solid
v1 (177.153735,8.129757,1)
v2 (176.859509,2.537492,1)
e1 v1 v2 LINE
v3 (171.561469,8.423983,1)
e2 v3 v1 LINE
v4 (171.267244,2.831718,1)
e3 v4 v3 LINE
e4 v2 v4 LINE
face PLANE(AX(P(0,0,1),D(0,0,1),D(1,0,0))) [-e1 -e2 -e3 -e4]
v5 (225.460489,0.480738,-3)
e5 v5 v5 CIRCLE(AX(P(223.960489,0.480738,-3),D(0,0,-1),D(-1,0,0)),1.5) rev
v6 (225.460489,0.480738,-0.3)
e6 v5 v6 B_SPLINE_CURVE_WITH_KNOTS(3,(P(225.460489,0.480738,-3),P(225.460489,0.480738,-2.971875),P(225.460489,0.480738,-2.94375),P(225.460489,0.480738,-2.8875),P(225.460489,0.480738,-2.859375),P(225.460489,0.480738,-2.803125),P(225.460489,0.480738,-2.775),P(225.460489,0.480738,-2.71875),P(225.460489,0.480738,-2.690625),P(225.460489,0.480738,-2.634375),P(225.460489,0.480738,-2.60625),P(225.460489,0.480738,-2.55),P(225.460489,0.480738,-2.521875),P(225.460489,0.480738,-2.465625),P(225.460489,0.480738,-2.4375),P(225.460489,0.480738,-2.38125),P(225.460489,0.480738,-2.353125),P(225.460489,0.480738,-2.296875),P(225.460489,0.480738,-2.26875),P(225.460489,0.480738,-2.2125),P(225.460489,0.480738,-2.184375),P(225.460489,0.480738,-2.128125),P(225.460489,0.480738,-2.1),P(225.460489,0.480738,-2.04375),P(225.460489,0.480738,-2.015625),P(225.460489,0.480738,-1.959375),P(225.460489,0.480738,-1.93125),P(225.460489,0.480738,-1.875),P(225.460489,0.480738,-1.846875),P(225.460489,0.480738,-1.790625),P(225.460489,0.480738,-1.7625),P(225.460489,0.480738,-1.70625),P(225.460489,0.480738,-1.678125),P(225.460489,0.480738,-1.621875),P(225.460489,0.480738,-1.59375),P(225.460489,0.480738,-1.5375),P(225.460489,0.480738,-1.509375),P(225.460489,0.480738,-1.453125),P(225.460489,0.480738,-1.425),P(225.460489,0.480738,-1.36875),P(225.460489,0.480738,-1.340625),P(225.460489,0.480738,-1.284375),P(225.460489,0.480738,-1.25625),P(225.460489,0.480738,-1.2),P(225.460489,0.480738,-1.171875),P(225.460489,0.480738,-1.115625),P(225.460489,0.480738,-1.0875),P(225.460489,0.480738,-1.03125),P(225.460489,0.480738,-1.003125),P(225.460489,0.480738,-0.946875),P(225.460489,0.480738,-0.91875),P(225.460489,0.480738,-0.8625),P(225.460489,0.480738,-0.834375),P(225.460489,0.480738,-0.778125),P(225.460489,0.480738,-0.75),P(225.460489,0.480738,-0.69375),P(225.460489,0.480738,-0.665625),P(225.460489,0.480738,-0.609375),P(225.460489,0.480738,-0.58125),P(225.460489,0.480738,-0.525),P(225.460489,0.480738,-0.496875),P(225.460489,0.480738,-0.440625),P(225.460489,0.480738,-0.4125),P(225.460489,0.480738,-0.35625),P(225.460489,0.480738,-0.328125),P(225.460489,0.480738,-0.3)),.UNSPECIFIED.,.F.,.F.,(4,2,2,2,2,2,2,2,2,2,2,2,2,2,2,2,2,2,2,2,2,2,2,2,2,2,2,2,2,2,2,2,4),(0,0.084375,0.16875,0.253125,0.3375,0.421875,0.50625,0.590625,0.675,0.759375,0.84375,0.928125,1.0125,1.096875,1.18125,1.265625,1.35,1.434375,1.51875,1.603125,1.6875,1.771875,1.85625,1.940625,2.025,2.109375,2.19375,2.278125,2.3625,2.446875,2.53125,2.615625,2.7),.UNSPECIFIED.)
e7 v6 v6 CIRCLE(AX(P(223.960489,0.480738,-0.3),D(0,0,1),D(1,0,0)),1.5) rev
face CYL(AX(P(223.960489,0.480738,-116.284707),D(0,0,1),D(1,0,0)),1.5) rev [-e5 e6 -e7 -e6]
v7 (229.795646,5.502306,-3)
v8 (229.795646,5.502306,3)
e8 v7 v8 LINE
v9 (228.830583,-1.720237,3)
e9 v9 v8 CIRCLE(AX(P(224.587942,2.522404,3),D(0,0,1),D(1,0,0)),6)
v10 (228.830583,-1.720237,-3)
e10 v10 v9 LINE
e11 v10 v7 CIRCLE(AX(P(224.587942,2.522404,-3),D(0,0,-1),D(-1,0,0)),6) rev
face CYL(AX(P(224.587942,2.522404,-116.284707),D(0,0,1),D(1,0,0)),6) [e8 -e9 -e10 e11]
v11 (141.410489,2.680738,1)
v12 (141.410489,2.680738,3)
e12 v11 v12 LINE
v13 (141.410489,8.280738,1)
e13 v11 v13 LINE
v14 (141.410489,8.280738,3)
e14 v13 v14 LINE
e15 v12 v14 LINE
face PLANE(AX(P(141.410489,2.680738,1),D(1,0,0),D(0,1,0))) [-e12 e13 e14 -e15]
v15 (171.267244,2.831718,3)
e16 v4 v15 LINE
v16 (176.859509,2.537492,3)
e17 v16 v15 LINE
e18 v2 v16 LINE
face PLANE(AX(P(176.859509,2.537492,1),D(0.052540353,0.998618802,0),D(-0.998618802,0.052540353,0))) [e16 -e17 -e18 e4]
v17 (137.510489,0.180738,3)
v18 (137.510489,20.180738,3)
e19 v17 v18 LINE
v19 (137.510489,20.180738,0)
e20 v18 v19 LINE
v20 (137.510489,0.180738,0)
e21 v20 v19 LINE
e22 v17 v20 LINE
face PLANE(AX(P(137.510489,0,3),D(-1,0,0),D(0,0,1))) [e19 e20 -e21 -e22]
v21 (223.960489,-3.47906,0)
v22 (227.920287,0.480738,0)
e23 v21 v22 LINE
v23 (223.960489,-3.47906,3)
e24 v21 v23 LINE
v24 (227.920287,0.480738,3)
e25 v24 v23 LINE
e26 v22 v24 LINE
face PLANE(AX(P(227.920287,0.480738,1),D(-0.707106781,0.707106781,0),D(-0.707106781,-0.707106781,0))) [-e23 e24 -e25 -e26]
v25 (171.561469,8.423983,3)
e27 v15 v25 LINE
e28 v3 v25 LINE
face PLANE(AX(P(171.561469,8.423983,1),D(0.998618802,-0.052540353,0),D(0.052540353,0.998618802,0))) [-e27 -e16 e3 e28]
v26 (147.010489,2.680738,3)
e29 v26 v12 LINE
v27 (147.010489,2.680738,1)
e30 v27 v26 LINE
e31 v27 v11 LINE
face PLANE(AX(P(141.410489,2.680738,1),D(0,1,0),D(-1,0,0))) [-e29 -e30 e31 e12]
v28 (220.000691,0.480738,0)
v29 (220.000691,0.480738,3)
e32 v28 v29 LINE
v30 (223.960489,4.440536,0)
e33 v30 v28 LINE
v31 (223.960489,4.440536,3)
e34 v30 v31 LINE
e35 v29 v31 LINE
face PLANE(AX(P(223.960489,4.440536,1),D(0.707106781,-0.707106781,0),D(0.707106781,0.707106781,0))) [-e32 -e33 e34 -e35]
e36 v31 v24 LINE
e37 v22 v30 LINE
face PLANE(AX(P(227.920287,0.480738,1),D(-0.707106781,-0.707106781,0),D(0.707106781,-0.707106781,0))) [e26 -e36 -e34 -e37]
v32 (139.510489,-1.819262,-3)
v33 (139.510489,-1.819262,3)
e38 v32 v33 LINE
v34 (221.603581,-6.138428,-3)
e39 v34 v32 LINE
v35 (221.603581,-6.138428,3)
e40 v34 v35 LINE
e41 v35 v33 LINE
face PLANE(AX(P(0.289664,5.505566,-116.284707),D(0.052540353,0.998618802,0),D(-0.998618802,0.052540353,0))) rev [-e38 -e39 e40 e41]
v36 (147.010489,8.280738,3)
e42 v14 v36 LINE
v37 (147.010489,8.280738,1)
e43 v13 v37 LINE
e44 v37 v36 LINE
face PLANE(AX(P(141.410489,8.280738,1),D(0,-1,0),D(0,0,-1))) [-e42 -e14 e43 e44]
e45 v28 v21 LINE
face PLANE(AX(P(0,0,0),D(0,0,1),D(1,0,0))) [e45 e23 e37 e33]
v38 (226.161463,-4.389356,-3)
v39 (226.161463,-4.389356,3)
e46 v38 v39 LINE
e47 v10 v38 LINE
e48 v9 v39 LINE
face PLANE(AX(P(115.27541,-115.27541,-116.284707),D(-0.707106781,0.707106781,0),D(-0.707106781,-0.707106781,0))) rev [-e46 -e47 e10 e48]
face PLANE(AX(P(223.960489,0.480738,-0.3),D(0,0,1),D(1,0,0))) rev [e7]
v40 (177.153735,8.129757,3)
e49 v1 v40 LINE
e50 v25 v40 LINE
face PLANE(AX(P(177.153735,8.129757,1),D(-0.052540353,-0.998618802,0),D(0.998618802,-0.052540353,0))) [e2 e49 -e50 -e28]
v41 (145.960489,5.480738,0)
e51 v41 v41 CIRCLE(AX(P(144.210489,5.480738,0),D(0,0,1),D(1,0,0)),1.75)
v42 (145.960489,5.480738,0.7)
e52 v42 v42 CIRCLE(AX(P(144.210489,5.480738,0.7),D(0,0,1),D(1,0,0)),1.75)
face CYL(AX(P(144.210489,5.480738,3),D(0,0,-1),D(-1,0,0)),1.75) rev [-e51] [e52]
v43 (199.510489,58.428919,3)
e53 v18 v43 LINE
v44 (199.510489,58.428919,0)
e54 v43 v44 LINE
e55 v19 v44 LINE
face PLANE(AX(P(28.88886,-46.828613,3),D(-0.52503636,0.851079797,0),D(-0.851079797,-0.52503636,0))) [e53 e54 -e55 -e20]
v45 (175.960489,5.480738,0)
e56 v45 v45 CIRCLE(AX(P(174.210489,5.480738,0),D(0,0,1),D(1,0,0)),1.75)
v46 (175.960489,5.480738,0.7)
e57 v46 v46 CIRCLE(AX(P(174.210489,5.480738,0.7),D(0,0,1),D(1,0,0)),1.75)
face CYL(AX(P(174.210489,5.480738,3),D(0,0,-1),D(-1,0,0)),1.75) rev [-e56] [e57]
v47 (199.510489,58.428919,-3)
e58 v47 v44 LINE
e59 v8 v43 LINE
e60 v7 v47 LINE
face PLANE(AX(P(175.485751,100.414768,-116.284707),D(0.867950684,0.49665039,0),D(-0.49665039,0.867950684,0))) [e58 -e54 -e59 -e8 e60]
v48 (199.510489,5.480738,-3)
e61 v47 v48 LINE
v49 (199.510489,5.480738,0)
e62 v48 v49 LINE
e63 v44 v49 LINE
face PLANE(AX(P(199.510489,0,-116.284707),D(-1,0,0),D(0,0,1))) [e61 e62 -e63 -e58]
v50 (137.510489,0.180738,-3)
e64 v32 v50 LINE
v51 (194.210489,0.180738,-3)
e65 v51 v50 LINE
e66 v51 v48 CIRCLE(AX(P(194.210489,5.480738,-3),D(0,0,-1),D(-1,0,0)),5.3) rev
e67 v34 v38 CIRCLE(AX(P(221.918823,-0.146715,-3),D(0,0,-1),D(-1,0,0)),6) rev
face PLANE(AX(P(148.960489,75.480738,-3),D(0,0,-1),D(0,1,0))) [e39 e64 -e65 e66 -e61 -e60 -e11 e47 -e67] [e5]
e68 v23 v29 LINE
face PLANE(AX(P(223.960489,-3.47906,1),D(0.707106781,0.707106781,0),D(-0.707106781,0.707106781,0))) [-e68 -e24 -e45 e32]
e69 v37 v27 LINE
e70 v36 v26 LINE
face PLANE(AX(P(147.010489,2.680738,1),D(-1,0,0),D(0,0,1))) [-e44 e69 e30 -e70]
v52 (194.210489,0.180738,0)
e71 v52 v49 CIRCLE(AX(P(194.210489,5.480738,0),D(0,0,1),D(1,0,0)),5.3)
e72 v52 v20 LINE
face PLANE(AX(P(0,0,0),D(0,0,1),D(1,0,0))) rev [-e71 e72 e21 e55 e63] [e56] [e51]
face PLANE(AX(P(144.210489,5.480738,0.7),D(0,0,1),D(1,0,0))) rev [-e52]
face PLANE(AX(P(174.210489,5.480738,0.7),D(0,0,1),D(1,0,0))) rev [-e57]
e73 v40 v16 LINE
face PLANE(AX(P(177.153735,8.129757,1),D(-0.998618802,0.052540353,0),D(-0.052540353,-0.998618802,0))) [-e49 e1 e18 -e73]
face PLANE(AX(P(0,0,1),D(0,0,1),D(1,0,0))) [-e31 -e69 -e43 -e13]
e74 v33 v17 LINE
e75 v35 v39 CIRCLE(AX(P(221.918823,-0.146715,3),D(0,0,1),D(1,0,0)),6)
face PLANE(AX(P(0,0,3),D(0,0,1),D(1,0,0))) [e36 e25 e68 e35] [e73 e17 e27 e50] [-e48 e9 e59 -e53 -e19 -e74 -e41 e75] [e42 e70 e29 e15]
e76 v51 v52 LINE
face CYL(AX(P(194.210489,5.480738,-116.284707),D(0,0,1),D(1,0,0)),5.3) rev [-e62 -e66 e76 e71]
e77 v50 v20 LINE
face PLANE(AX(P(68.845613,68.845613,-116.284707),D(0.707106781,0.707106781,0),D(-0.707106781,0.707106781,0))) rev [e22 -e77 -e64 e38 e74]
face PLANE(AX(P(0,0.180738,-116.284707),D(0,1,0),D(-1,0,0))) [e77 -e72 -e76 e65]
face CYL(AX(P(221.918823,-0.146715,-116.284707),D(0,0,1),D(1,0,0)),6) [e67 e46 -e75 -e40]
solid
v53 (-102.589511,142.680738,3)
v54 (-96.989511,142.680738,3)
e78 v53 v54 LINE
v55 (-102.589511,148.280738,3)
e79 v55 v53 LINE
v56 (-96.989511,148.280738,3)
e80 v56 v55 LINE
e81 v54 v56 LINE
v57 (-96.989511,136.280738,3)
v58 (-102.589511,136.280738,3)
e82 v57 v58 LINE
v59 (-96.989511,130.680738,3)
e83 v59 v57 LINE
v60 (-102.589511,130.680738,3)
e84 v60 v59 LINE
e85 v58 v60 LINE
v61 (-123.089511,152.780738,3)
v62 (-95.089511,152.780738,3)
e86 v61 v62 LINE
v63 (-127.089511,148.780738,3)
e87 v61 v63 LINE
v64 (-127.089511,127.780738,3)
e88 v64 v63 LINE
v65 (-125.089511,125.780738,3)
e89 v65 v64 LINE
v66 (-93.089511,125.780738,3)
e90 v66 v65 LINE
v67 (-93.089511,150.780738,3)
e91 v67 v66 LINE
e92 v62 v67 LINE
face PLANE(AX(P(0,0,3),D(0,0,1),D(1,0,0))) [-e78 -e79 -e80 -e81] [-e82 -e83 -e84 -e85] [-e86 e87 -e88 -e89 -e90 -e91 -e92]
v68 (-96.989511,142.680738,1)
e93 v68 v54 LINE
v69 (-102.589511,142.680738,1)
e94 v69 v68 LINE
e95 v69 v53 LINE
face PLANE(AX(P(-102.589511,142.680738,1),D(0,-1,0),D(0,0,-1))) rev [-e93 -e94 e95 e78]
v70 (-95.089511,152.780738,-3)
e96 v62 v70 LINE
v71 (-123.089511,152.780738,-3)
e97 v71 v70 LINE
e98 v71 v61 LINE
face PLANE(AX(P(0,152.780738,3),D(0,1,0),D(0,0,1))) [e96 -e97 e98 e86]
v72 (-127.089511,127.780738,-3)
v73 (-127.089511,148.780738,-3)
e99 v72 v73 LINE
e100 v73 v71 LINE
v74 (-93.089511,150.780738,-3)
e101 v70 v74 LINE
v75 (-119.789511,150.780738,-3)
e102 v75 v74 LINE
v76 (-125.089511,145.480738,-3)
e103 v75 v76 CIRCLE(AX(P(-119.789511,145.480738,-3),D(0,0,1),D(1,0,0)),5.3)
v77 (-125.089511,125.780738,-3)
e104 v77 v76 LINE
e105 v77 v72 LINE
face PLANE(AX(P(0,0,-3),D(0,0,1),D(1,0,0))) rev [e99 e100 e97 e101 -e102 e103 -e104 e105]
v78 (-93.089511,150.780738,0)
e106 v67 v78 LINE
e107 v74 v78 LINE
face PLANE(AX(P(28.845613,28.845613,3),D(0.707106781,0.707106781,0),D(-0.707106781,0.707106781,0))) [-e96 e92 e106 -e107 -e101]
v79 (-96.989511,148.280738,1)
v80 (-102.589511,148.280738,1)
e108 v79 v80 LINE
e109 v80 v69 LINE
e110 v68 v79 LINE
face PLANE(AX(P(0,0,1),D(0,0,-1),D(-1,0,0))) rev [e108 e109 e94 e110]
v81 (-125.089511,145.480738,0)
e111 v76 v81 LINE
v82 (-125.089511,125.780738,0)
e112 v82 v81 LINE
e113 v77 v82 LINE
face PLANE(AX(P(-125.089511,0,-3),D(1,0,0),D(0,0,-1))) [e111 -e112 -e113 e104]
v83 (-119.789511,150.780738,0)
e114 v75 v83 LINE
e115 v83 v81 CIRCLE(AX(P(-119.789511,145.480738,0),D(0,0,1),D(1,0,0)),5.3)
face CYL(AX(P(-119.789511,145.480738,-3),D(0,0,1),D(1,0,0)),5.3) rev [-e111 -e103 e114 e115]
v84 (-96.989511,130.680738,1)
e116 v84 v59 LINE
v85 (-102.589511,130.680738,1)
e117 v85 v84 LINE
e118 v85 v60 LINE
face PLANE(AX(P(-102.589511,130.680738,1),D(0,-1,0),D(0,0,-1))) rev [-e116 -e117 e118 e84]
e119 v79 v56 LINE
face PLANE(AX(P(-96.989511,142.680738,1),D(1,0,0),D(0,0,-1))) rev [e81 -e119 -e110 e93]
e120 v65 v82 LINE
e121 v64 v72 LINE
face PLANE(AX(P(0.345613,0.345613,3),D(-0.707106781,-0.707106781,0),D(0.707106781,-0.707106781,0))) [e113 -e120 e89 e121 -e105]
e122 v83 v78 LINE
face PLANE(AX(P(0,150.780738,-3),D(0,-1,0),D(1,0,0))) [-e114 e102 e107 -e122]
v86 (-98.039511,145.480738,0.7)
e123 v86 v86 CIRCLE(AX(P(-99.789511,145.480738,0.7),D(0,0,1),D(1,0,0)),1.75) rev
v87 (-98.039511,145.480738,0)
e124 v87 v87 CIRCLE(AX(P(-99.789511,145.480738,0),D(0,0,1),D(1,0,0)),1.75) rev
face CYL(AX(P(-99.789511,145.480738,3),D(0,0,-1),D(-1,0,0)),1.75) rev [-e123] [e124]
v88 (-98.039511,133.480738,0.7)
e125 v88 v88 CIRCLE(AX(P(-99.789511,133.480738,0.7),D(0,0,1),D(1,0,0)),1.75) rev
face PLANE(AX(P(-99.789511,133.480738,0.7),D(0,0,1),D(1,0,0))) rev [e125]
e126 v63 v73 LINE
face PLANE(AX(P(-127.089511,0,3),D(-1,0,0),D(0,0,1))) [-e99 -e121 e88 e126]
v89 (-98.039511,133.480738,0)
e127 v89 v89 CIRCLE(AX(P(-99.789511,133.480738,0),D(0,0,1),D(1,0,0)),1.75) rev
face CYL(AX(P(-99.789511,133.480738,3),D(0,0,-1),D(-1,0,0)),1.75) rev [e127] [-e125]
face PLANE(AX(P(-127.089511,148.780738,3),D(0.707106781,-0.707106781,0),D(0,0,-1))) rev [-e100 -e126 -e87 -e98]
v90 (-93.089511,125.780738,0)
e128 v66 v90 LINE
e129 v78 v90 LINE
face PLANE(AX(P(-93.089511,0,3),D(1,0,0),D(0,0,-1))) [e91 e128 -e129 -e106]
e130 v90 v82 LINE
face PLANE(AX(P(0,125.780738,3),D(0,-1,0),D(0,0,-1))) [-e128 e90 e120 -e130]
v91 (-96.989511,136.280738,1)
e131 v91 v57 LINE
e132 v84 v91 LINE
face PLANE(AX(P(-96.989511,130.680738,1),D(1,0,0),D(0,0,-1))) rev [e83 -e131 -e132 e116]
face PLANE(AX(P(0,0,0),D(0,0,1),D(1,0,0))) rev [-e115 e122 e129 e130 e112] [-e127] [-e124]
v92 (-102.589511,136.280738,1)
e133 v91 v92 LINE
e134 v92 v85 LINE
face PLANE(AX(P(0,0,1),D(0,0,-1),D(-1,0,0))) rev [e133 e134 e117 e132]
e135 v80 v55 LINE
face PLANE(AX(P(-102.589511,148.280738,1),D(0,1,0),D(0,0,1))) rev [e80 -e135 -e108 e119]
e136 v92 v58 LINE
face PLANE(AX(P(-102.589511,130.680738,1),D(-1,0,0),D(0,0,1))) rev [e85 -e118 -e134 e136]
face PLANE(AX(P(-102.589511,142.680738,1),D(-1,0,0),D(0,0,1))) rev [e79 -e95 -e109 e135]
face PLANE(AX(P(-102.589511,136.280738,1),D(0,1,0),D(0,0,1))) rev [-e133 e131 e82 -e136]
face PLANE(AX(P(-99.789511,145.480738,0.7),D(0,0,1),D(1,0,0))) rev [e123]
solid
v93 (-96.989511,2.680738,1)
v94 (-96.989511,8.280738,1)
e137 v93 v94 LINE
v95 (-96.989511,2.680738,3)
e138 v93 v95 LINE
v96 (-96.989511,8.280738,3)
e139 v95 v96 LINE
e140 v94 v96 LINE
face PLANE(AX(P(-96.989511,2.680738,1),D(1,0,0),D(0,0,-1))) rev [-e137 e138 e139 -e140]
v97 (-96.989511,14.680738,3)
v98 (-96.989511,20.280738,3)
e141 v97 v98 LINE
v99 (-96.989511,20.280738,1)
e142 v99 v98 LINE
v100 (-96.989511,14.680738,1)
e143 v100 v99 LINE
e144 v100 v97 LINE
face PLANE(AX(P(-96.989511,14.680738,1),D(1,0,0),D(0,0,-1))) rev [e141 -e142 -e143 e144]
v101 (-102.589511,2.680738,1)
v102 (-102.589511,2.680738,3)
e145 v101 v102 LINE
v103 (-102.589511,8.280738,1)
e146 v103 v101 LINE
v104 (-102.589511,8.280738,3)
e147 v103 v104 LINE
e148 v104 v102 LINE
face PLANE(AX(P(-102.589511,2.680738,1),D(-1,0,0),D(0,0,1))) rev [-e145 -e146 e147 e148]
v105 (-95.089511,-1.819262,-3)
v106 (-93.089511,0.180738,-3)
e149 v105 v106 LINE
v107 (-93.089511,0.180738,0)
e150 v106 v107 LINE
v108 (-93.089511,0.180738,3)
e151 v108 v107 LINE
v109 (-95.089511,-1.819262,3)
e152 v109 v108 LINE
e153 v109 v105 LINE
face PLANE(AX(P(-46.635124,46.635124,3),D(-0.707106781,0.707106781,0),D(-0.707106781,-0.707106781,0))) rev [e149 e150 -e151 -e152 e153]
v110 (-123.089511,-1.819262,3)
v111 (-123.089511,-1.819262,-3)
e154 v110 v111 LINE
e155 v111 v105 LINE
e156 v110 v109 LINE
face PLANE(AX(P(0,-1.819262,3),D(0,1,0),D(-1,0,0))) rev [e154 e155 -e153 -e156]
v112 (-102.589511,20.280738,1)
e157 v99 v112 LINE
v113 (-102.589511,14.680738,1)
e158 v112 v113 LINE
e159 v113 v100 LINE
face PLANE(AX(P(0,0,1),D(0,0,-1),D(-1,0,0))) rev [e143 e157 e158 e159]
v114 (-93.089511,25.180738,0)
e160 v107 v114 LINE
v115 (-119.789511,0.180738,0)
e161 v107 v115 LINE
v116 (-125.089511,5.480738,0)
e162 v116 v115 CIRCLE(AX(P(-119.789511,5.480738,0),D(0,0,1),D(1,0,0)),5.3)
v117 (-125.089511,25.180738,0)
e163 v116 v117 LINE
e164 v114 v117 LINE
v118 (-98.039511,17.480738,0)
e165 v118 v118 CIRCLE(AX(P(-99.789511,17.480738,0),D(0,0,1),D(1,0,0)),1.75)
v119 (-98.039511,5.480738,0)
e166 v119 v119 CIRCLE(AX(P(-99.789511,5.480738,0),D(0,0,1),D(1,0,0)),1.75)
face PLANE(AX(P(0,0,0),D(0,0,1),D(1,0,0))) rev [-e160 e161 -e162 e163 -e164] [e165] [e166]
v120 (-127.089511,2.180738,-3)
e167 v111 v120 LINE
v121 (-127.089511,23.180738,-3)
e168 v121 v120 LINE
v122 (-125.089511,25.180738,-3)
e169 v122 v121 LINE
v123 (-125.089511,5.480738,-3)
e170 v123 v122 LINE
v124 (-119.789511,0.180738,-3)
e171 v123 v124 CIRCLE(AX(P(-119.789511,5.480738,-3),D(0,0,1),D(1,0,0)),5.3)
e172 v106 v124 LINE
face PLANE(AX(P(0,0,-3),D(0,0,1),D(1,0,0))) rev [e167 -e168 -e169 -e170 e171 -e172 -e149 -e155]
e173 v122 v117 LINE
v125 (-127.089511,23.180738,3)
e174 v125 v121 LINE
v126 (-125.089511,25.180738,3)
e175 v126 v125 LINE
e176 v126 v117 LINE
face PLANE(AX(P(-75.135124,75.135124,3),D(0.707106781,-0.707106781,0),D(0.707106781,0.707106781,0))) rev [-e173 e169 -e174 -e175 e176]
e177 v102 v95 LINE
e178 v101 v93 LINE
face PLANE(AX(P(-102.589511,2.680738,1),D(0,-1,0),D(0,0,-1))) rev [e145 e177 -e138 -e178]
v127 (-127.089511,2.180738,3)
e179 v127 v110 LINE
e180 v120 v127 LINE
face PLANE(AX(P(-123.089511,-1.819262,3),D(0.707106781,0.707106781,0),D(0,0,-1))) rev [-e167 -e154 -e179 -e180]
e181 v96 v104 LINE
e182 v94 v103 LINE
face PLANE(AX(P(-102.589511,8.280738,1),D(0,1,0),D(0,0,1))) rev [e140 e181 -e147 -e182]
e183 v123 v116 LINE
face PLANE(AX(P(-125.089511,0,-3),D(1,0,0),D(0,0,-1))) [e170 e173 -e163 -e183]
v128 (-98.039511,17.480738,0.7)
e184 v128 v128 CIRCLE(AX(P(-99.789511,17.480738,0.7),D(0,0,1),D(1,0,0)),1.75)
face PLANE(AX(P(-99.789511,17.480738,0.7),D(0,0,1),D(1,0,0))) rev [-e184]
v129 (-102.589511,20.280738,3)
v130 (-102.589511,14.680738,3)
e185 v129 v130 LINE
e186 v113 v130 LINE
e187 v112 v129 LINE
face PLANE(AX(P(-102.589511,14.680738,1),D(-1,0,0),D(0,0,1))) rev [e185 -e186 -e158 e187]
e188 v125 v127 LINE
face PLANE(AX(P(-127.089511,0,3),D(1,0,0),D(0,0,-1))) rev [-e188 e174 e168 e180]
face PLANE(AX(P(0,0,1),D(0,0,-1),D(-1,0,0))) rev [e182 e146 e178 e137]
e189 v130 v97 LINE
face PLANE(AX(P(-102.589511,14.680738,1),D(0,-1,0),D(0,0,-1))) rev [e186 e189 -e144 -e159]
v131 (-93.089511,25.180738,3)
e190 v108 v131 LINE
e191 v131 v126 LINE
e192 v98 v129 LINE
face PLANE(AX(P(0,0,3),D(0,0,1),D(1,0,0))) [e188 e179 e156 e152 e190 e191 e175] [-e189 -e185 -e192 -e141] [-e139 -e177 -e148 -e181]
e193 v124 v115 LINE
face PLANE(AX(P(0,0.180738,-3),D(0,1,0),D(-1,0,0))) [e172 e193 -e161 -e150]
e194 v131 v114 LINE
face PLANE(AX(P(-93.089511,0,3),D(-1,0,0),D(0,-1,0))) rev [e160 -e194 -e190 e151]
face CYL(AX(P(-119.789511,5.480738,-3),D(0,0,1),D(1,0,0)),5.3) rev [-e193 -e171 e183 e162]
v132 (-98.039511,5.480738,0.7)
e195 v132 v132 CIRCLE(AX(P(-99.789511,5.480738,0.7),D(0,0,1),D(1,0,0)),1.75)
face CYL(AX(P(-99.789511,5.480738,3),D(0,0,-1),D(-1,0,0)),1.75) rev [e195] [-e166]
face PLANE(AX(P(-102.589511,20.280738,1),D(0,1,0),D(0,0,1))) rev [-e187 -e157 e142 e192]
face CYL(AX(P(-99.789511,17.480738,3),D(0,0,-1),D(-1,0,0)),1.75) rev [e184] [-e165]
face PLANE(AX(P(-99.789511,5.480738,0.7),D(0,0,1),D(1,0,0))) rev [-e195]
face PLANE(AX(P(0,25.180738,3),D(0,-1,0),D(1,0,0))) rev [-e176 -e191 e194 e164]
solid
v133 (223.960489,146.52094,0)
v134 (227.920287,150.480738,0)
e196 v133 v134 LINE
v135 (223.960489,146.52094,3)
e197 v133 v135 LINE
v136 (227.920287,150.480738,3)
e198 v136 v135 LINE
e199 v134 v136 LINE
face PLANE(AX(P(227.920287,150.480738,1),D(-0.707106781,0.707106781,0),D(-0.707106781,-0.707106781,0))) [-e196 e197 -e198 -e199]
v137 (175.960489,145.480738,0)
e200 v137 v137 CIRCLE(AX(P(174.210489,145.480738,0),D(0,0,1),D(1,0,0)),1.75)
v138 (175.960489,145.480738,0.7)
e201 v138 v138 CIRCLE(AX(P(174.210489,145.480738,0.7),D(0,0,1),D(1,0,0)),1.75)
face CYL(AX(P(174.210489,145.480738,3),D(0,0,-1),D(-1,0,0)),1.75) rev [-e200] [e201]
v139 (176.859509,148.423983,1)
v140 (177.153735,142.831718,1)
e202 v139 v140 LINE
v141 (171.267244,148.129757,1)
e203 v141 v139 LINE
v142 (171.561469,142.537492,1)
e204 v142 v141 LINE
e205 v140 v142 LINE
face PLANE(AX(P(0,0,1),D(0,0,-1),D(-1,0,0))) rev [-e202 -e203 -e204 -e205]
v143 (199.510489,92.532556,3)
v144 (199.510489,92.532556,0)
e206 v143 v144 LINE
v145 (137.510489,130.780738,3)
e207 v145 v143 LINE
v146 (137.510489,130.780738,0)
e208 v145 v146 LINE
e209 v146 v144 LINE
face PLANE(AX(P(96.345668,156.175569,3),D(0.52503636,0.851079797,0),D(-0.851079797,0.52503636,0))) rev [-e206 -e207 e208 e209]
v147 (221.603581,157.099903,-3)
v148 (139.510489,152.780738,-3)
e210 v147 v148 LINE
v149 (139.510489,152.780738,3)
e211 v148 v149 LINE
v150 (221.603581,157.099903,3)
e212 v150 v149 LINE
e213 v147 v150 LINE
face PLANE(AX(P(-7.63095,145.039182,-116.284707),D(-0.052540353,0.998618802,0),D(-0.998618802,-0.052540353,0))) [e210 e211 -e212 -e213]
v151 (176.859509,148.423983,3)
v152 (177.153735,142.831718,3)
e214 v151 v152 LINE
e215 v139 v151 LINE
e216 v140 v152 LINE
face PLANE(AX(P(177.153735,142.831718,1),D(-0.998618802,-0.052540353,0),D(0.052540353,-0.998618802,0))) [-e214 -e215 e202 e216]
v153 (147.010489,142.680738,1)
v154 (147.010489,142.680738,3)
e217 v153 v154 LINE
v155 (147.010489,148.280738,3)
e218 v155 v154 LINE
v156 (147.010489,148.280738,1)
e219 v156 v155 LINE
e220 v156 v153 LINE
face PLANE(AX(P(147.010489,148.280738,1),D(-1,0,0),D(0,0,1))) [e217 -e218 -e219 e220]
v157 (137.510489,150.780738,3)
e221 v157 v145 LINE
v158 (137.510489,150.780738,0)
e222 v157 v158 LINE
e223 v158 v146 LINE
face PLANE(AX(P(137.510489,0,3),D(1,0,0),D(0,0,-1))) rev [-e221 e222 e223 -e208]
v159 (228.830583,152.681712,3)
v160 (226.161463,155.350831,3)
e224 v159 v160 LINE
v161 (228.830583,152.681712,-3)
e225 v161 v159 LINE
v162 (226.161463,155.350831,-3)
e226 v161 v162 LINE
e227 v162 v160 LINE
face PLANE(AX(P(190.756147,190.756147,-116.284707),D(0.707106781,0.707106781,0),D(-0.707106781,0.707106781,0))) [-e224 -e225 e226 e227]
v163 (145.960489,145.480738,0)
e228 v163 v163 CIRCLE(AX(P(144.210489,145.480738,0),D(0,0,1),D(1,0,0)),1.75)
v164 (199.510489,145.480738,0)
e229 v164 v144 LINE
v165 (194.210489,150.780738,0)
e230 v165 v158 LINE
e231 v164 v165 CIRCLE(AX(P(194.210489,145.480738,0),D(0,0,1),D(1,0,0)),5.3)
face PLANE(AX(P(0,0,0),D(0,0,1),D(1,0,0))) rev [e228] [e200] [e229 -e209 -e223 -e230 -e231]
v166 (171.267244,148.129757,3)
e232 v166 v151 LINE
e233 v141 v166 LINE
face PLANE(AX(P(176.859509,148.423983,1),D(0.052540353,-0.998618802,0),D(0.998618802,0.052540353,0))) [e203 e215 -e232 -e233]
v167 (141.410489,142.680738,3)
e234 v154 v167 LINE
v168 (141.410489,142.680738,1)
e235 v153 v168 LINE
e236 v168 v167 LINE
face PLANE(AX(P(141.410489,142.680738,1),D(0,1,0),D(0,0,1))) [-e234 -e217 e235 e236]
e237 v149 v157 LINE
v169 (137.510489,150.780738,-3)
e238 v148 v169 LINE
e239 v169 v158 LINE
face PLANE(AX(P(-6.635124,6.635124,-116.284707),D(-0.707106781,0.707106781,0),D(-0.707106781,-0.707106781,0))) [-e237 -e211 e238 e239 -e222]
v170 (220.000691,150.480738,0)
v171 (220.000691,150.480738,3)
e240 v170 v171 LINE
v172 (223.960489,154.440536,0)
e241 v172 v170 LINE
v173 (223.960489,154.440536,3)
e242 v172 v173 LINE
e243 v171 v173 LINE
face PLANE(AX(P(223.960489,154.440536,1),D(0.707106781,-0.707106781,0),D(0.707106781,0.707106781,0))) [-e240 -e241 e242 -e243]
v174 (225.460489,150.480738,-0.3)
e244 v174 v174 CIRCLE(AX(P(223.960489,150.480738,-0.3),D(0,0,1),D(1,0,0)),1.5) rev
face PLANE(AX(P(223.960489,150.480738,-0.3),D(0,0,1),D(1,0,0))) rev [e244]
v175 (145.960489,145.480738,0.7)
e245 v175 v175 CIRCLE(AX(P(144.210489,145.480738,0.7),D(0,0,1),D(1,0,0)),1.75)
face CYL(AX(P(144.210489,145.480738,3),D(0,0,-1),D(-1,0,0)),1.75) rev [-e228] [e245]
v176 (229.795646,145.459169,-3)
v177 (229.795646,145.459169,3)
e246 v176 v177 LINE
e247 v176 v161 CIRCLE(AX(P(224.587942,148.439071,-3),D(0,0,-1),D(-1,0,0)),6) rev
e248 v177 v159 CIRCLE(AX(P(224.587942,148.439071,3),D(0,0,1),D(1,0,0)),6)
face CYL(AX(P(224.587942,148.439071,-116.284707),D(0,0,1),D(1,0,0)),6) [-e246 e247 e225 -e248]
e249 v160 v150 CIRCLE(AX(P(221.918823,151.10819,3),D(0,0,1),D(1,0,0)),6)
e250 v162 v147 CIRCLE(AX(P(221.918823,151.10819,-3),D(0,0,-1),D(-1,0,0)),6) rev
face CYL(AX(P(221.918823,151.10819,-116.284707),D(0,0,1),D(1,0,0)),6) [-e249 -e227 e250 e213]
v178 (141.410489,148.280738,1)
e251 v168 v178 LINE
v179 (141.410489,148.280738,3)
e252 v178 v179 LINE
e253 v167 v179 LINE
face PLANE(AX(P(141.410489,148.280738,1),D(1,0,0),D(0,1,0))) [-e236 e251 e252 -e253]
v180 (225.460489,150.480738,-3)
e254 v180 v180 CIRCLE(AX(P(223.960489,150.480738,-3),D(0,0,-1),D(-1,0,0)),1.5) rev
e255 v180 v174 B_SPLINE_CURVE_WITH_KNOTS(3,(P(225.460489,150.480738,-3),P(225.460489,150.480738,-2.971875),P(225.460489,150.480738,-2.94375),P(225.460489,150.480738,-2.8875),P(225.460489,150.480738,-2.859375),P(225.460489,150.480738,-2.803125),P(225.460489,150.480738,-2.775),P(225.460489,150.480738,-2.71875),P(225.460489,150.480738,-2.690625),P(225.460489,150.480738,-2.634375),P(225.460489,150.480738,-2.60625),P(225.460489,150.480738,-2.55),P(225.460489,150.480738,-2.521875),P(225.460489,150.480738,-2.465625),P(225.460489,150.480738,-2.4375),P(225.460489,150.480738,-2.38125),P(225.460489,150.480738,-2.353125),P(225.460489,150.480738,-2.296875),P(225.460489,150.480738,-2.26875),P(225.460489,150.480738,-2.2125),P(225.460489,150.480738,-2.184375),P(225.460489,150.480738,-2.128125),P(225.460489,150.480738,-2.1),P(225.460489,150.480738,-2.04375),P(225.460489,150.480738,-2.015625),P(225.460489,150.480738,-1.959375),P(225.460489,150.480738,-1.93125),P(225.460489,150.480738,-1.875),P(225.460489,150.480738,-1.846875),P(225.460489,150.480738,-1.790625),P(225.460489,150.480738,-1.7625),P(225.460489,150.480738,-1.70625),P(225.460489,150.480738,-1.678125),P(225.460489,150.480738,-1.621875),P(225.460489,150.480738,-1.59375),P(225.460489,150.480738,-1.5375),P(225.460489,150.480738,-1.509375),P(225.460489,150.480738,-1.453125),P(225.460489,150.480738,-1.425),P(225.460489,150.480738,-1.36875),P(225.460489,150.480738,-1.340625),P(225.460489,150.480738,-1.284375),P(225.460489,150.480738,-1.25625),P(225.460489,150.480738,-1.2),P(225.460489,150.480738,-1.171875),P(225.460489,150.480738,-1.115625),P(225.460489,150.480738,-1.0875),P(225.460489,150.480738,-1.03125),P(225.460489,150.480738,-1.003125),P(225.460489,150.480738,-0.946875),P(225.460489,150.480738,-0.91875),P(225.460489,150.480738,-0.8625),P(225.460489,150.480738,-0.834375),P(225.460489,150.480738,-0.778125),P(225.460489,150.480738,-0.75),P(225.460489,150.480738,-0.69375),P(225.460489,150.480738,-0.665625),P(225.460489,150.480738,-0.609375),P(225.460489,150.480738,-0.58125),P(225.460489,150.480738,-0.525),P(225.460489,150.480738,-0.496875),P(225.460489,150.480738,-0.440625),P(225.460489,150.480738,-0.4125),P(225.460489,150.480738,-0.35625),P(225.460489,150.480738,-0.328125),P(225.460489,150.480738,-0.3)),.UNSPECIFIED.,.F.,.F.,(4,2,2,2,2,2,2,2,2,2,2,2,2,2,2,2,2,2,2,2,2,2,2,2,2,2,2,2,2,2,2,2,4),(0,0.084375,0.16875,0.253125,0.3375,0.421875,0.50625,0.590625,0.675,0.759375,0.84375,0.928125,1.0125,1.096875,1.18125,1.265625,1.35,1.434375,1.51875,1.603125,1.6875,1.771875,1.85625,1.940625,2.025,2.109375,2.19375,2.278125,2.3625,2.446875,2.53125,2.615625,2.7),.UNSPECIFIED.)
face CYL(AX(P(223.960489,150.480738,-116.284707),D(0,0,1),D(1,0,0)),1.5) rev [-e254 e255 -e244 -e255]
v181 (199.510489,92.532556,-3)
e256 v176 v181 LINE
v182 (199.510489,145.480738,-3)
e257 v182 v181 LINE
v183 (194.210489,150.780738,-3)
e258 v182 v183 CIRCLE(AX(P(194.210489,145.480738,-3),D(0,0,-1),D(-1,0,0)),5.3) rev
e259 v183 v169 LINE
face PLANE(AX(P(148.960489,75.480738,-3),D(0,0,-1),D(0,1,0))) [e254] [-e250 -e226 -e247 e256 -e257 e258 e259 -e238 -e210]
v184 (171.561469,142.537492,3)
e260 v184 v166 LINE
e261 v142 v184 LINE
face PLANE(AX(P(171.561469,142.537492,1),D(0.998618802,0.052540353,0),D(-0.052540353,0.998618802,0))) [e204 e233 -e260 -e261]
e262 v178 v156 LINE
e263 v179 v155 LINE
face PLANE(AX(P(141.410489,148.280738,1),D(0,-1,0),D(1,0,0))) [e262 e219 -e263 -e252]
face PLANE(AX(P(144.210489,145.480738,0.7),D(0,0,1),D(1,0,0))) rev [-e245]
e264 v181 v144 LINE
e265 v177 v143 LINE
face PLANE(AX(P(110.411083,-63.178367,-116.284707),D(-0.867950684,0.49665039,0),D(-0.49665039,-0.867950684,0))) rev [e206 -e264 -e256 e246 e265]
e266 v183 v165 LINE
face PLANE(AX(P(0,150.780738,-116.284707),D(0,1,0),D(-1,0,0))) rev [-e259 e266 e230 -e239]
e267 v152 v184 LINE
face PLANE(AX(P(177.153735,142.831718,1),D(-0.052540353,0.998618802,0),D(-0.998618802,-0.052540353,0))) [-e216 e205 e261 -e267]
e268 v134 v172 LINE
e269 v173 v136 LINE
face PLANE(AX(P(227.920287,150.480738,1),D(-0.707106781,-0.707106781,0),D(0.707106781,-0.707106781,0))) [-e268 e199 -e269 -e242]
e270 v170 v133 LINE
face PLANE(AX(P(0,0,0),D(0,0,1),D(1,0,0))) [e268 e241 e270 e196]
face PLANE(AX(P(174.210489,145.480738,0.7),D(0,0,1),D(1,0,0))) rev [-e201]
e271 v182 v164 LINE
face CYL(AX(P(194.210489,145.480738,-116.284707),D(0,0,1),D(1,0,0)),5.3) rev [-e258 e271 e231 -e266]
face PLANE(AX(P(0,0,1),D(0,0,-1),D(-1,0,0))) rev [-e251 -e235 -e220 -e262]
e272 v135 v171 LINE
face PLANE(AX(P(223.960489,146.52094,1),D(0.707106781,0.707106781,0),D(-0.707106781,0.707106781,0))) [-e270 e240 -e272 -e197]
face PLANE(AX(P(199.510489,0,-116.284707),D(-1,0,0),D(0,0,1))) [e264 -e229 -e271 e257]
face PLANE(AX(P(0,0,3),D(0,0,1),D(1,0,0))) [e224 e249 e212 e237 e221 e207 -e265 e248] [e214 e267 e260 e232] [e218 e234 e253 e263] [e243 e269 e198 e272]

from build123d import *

# Parameters (mm, degrees)
SKETCH1_R                   = 1.5
BOSS_EXTRUDE1_DEPTH         = 3
BOSS_EXTRUDE2_OUTLINE_R     = 1.75
BOSS_EXTRUDE2_OUTLINE_R_2   = 1.5
BOSS_EXTRUDE2_DEPTH         = 3
BOSS_EXTRUDE2_2_OUTLINE_R   = 1.75
BOSS_EXTRUDE2_2_OUTLINE_R_2 = 1.5
BOSS_EXTRUDE2_2_DEPTH       = 3
SKETCH2_W                   = 5.6
SKETCH2_H                   = 5.6
CUT_EXTRUDE3_DEPTH          = 2
SKETCH3_R                   = 1.75
BOSS_EXTRUDE3_DEPTH         = 3
BOSS_EXTRUDE4_DEPTH         = 3
CHAMFER1_SIZE               = 4
CHAMFER2_SIZE               = 4
CUT_EXTRUDE4_DEPTH          = 1
SKETCH5_W                   = 5.6
SKETCH5_H                   = 5.6
CUT_EXTRUDE5_DEPTH          = 2
BOSS_EXTRUDE5_START         = -0.3
SKETCH6_R                   = 1.75
BOSS_EXTRUDE5_DEPTH         = 0.3
SKETCH7_R                   = 1.5
BOSS_EXTRUDE6_DEPTH         = 0.3


# Read off the part's stored shape, not the designer's step: Boss-Extrude2
with BuildPart() as part:
    # Sketch1 → Boss-Extrude1 (new body)
    # profile 1 of 4: a face of its own
    with BuildSketch(Plane.XY):
        with BuildLine():
            Line((229.79564609, 5.502306365), (199.510489142, 58.42891882))
            Line((199.510489142, 58.42891882), (199.510489142, 5.762730679))
            Line((199.510489142, 5.762730679), (218.9389204, -5.354419326))
            ThreePointArc((218.9389204, -5.354419326), (220.225257958, -5.902741482), (221.603580618, -6.13842803))
            ThreePointArc((221.603580618, -6.13842803), (224.068457171, -5.7484178), (226.161463425, -4.389355907))
            Line((226.161463425, -4.389355907), (228.830582671, -1.72023666))
            ThreePointArc((228.830582671, -1.72023666), (230.535087191, 1.727757007), (229.79564609, 5.502306365))
        make_face()
        with Locations((223.960489142, 0.480737622)):
            Circle(SKETCH1_R, mode=Mode.SUBTRACT)
    # profile 2 of 4: a face of its own
    with BuildSketch(Plane.XY):
        with BuildLine():
            Line((199.510489142, 145.198744566), (199.510489142, 92.532556425))
            Line((199.510489142, 92.532556425), (229.79564609, 145.45916888))
            ThreePointArc((229.79564609, 145.45916888), (230.535087191, 149.233718237), (228.830582671, 152.681711905))
            Line((228.830582671, 152.681711905), (226.161463425, 155.350831151))
            ThreePointArc((226.161463425, 155.350831151), (224.068457171, 156.709893045), (221.603580618, 157.099903275))
            ThreePointArc((221.603580618, 157.099903275), (220.225257958, 156.864216727), (218.9389204, 156.31589457))
            Line((218.9389204, 156.31589457), (199.510489142, 145.198744566))
        make_face()
        with Locations((223.960489142, 150.480737622)):
            Circle(SKETCH1_R, mode=Mode.SUBTRACT)
    # profile 3 of 4: a face of its own
    with BuildSketch(Plane.XY):
        with BuildLine():
            Line((218.9389204, -5.354419326), (199.510489142, 5.762730679))
            Line((199.510489142, 5.762730679), (199.510489142, 5.480737623))
            ThreePointArc((199.510489142, 5.480737623), (197.958155082, 1.733071682), (194.210489142, 0.180737622))
            Line((194.210489142, 0.180737622), (137.510489142, 0.180737622))
            Line((137.510489142, 0.180737623), (139.510489142, -1.819262377))
            Line((139.510489142, -1.819262377), (221.603580618, -6.13842803))
            ThreePointArc((221.603580618, -6.13842803), (220.225257958, -5.902741482), (218.9389204, -5.354419326))
        make_face()
    # profile 4 of 4: a face of its own
    with BuildSketch(Plane.XY):
        with BuildLine():
            Line((199.510489142, 145.480737623), (199.510489142, 145.198744566))
            Line((199.510489142, 145.198744566), (218.9389204, 156.31589457))
            ThreePointArc((218.9389204, 156.31589457), (220.225257958, 156.864216727), (221.603580618, 157.099903275))
            Line((221.603580618, 157.099903275), (139.510489142, 152.780737622))
            Line((139.510489142, 152.780737622), (137.510489142, 150.780737622))
            Line((137.510489142, 150.780737622), (194.210489141, 150.780737622))
            ThreePointArc((194.210489141, 150.780737622), (197.958155082, 149.228403563), (199.510489142, 145.480737623))
        make_face()
    extrude(amount=-BOSS_EXTRUDE1_DEPTH)

    # Boss-Extrude2 outline → Boss-Extrude2 (add)
    with BuildSketch(Plane.XY):
        with BuildLine():
            Line((228.830582671, 152.681711905), (226.161463425, 155.350831151))
            ThreePointArc((226.161463425, 155.350831151), (224.068457172, 156.709893045), (221.603580618, 157.099903275))
            Line((221.603580618, 157.099903275), (139.510489142, 152.780737622))
            Line((139.510489142, 152.780737622), (137.510489142, 150.780737622))
            Line((137.510489142, 150.780737622), (137.510489142, 130.780737622))
            Line((137.510489142, 130.780737622), (199.510489142, 92.532556425))
            Line((199.510489142, 92.532556425), (229.79564609, 145.45916888))
            ThreePointArc((229.79564609, 145.45916888), (230.535087191, 149.233718237), (228.830582671, 152.681711905))
        make_face()
        with Locations((144.210489142, 145.480737622)):
            Circle(BOSS_EXTRUDE2_OUTLINE_R, mode=Mode.SUBTRACT)
        with Locations((174.210489142, 145.480737622)):
            Circle(BOSS_EXTRUDE2_OUTLINE_R, mode=Mode.SUBTRACT)
        with Locations((223.960489142, 150.480737622)):
            Circle(BOSS_EXTRUDE2_OUTLINE_R_2, mode=Mode.SUBTRACT)
    extrude(amount=BOSS_EXTRUDE2_DEPTH)


with BuildPart() as body_2:
    # Boss-Extrude2 2 outline → Boss-Extrude2 2 (new body)
    with BuildSketch(Plane.XY):
        with BuildLine():
            Line((199.510489142, 58.42891882), (137.510489142, 20.180737623))
            Line((137.510489142, 20.180737623), (137.510489142, 0.180737622))
            Line((137.510489142, 0.180737622), (139.510489142, -1.819262377))
            Line((139.510489142, -1.819262377), (221.603580618, -6.13842803))
            ThreePointArc((221.603580618, -6.13842803), (224.068457172, -5.7484178), (226.161463425, -4.389355907))
            Line((226.161463425, -4.389355907), (228.830582671, -1.72023666))
            ThreePointArc((228.830582671, -1.72023666), (230.535087191, 1.727757008), (229.79564609, 5.502306365))
            Line((229.79564609, 5.502306365), (199.510489142, 58.42891882))
        make_face()
        with Locations((144.210489142, 5.480737622)):
            Circle(BOSS_EXTRUDE2_2_OUTLINE_R, mode=Mode.SUBTRACT)
        with Locations((174.210489142, 5.480737622)):
            Circle(BOSS_EXTRUDE2_2_OUTLINE_R, mode=Mode.SUBTRACT)
        with Locations((223.960489142, 0.480737622)):
            Circle(BOSS_EXTRUDE2_2_OUTLINE_R_2, mode=Mode.SUBTRACT)
    extrude(amount=BOSS_EXTRUDE2_2_DEPTH)


with BuildPart() as cut_extrude3_tool:
    # Sketch2 → Cut-Extrude3 (new body)
    with BuildSketch(Plane(origin=(0, 0, 3), x_dir=(-1, 0, 0), z_dir=(0, 0, -1))):
        Polygon((-177.153734776, 142.831717967), (-176.859508797, 148.423983257), (-171.267243507, 148.129757278), (-171.561469486, 142.537491988), align=None)
        with Locations((-144.210489142, 145.480737622)):
            Rectangle(SKETCH2_W, SKETCH2_H)
        Polygon((-227.920287116, 150.480737622), (-223.960489142, 146.520939648), (-220.000691167, 150.480737622), (-223.960489142, 154.440535597), align=None)
        Polygon((-227.920287116, 0.480737622), (-223.960489142, -3.479060352), (-220.000691167, 0.480737622), (-223.960489142, 4.440535597), align=None)
        Polygon((-177.153734776, 8.129757278), (-176.859508797, 2.537491988), (-171.267243507, 2.831717967), (-171.561469486, 8.423983257), align=None)
        with Locations((-144.210489142, 5.480737622)):
            Rectangle(SKETCH2_W, SKETCH2_H)
    extrude(amount=CUT_EXTRUDE3_DEPTH)


with BuildPart() as part_1:
    add(part.part)

    # Cut-Extrude3: cut by cut_extrude3_tool
    add(cut_extrude3_tool.part, mode=Mode.SUBTRACT)


with BuildPart() as body_2_1:
    add(body_2.part)

    # Cut-Extrude3: cut by cut_extrude3_tool
    add(cut_extrude3_tool.part, mode=Mode.SUBTRACT)


with BuildPart() as part_2:
    add(part_1.part)

    # Combine1: union body 2
    add(body_2_1.part)

    # Sketch4 → Cut-Extrude4 (cut)
    with BuildSketch(Plane.XY.offset(1)):
        Polygon((227.920287116, 0.480737622), (223.960489142, 4.440535597), (220.000691167, 0.480737622), (223.960489142, -3.479060352), align=None)
        Polygon((227.920287116, 150.480737622), (223.960489142, 154.440535597), (220.000691167, 150.480737622), (223.960489142, 146.520939648), align=None)
    extrude(amount=-CUT_EXTRUDE4_DEPTH, mode=Mode.SUBTRACT)



with BuildPart() as body_2_2:
    # Sketch3 → Boss-Extrude3 (new body)
    # profile 1 of 4: a face of its own
    with BuildSketch(Plane.XY):
        with BuildLine():
            Line((-93.089510858, 25.180737622), (-125.089510858, 25.180737622))
            Line((-125.089510858, 25.180737622), (-125.089510858, 5.480737622))
            ThreePointArc((-125.089510858, 5.480737622), (-123.537176799, 1.733071682), (-119.789510858, 0.180737622))
            Line((-119.789510858, 0.180737622), (-93.089510858, 0.180737622))
            Line((-93.089510858, 0.180737622), (-93.089510858, 25.180737622))
        make_face()
        with Locations((-99.789510858, 5.480737622)):
            Circle(SKETCH3_R, mode=Mode.SUBTRACT)
        with Locations((-99.789510858, 17.480737622)):
            Circle(SKETCH3_R, mode=Mode.SUBTRACT)
    # profile 2 of 4: a face of its own
    with BuildSketch(Plane.XY):
        with BuildLine():
            Line((-125.089510858, 5.480737622), (-125.089510858, 25.180737622))
            Line((-125.089510858, 25.180737622), (-127.089510858, 23.180737622))
            Line((-127.089510858, 23.180737622), (-127.089510858, -1.819262378))
            Line((-127.089510858, -1.819262378), (-95.089510858, -1.819262378))
            Line((-95.089510858, -1.819262378), (-93.089510858, 0.180737622))
            Line((-93.089510858, 0.180737622), (-119.789510858, 0.180737622))
            ThreePointArc((-119.789510858, 0.180737622), (-123.537176799, 1.733071682), (-125.089510858, 5.480737622))
        make_face()
    # profile 3 of 4: a face of its own
    with BuildSketch(Plane.XY):
        with BuildLine():
            Line((-125.089510858, 145.480737622), (-125.089510858, 125.780737622))
            Line((-125.089510858, 125.780737622), (-93.089510858, 125.780737622))
            Line((-93.089510858, 125.780737622), (-93.089510858, 150.780737622))
            Line((-93.089510858, 150.780737622), (-119.789510858, 150.780737622))
            ThreePointArc((-119.789510858, 150.780737622), (-123.537176799, 149.228403563), (-125.089510858, 145.480737622))
        make_face()
        with Locations((-99.789510858, 133.480737622)):
            Circle(SKETCH3_R, mode=Mode.SUBTRACT)
        with Locations((-99.789510858, 145.480737622)):
            Circle(SKETCH3_R, mode=Mode.SUBTRACT)
    # profile 4 of 4: a face of its own
    with BuildSketch(Plane.XY):
        with BuildLine():
            Line((-127.089510858, 127.780737622), (-125.089510858, 125.780737622))
            Line((-125.089510858, 125.780737622), (-125.089510858, 145.480737622))
            ThreePointArc((-125.089510858, 145.480737622), (-123.537176799, 149.228403563), (-119.789510858, 150.780737622))
            Line((-119.789510858, 150.780737622), (-93.089510858, 150.780737622))
            Line((-93.089510858, 150.780737622), (-95.089510858, 152.780737622))
            Line((-95.089510858, 152.780737622), (-127.089510858, 152.780737622))
            Line((-127.089510858, 152.780737622), (-127.089510858, 127.780737622))
        make_face()
    extrude(amount=BOSS_EXTRUDE3_DEPTH)

    # Sketch3<3> → Boss-Extrude4 (add)
    with BuildSketch(Plane.XY):
        with BuildLine():
            Line((-125.089510858, 5.480737622), (-125.089510858, 25.180737622))
            Line((-125.089510858, 25.180737622), (-127.089510858, 23.180737622))
            Line((-127.089510858, 23.180737622), (-127.089510858, -1.819262378))
            Line((-127.089510858, -1.819262378), (-95.089510858, -1.819262378))
            Line((-95.089510858, -1.819262378), (-93.089510858, 0.180737622))
            Line((-93.089510858, 0.180737622), (-119.789510858, 0.180737622))
            ThreePointArc((-119.789510858, 0.180737622), (-123.537176799, 1.733071682), (-125.089510858, 5.480737622))
        make_face()
        with BuildLine():
            Line((-127.089510858, 127.780737622), (-125.089510858, 125.780737622))
            Line((-125.089510858, 125.780737622), (-125.089510858, 145.480737622))
            ThreePointArc((-125.089510858, 145.480737622), (-123.537176799, 149.228403563), (-119.789510858, 150.780737622))
            Line((-119.789510858, 150.780737622), (-93.089510858, 150.780737622))
            Line((-93.089510858, 150.780737622), (-95.089510858, 152.780737622))
            Line((-95.089510858, 152.780737622), (-127.089510858, 152.780737622))
            Line((-127.089510858, 152.780737622), (-127.089510858, 127.780737622))
        make_face()
    extrude(amount=-BOSS_EXTRUDE4_DEPTH)

    # Chamfer1
    chamfer1_edges = [body_2_2.edges().sort_by_distance(p)[0] for p in [
        (-127.089510858, 152.780737622, 0),
    ]]
    chamfer(chamfer1_edges, length=CHAMFER1_SIZE)

    # Chamfer2
    chamfer2_edges = [body_2_2.edges().sort_by_distance(p)[0] for p in [
        (-127.089510858, -1.819262378, 0),
    ]]
    chamfer(chamfer2_edges, length=CHAMFER2_SIZE)

    # Sketch5 → Cut-Extrude5 (cut)
    with BuildSketch(Plane.XY.offset(3)):
        with Locations((-99.789510858, 145.480737622)):
            Rectangle(SKETCH5_W, SKETCH5_H)
        with Locations((-99.789510858, 133.480737622)):
            Rectangle(SKETCH5_W, SKETCH5_H)
        with Locations((-99.789510858, 17.480737622)):
            Rectangle(SKETCH5_W, SKETCH5_H)
        with Locations((-99.789510858, 5.480737622)):
            Rectangle(SKETCH5_W, SKETCH5_H)
    extrude(amount=-CUT_EXTRUDE5_DEPTH, mode=Mode.SUBTRACT)


with BuildPart() as part_3:
    add(part_2.part)

    add(body_2_2.part)  # Boss-Extrude5 merges body 2 2
    # Sketch6 → Boss-Extrude5 (add)
    with BuildSketch(Plane.XY.offset(1).offset(BOSS_EXTRUDE5_START)):
        with Locations((-99.789510858, 145.480737622)):
            Circle(SKETCH6_R)
        with Locations((-99.789510858, 133.480737622)):
            Circle(SKETCH6_R)
        with Locations((-99.789510858, 17.480737622)):
            Circle(SKETCH6_R)
        with Locations((-99.789510858, 5.480737622)):
            Circle(SKETCH6_R)
        with Locations((144.210489142, 145.480737622)):
            Circle(SKETCH6_R)
        with Locations((174.210489142, 145.480737622)):
            Circle(SKETCH6_R)
        with Locations((144.210489142, 5.480737622)):
            Circle(SKETCH6_R)
        with Locations((174.210489142, 5.480737622)):
            Circle(SKETCH6_R)
    extrude(amount=BOSS_EXTRUDE5_DEPTH)

    # Sketch7 → Boss-Extrude6 (add)
    with BuildSketch(Plane.XY):
        with Locations((223.960489142, 0.480737622)):
            Circle(SKETCH7_R)
        with Locations((223.960489142, 150.480737622)):
            Circle(SKETCH7_R)
    extrude(amount=-BOSS_EXTRUDE6_DEPTH)


solid = part_3.part
